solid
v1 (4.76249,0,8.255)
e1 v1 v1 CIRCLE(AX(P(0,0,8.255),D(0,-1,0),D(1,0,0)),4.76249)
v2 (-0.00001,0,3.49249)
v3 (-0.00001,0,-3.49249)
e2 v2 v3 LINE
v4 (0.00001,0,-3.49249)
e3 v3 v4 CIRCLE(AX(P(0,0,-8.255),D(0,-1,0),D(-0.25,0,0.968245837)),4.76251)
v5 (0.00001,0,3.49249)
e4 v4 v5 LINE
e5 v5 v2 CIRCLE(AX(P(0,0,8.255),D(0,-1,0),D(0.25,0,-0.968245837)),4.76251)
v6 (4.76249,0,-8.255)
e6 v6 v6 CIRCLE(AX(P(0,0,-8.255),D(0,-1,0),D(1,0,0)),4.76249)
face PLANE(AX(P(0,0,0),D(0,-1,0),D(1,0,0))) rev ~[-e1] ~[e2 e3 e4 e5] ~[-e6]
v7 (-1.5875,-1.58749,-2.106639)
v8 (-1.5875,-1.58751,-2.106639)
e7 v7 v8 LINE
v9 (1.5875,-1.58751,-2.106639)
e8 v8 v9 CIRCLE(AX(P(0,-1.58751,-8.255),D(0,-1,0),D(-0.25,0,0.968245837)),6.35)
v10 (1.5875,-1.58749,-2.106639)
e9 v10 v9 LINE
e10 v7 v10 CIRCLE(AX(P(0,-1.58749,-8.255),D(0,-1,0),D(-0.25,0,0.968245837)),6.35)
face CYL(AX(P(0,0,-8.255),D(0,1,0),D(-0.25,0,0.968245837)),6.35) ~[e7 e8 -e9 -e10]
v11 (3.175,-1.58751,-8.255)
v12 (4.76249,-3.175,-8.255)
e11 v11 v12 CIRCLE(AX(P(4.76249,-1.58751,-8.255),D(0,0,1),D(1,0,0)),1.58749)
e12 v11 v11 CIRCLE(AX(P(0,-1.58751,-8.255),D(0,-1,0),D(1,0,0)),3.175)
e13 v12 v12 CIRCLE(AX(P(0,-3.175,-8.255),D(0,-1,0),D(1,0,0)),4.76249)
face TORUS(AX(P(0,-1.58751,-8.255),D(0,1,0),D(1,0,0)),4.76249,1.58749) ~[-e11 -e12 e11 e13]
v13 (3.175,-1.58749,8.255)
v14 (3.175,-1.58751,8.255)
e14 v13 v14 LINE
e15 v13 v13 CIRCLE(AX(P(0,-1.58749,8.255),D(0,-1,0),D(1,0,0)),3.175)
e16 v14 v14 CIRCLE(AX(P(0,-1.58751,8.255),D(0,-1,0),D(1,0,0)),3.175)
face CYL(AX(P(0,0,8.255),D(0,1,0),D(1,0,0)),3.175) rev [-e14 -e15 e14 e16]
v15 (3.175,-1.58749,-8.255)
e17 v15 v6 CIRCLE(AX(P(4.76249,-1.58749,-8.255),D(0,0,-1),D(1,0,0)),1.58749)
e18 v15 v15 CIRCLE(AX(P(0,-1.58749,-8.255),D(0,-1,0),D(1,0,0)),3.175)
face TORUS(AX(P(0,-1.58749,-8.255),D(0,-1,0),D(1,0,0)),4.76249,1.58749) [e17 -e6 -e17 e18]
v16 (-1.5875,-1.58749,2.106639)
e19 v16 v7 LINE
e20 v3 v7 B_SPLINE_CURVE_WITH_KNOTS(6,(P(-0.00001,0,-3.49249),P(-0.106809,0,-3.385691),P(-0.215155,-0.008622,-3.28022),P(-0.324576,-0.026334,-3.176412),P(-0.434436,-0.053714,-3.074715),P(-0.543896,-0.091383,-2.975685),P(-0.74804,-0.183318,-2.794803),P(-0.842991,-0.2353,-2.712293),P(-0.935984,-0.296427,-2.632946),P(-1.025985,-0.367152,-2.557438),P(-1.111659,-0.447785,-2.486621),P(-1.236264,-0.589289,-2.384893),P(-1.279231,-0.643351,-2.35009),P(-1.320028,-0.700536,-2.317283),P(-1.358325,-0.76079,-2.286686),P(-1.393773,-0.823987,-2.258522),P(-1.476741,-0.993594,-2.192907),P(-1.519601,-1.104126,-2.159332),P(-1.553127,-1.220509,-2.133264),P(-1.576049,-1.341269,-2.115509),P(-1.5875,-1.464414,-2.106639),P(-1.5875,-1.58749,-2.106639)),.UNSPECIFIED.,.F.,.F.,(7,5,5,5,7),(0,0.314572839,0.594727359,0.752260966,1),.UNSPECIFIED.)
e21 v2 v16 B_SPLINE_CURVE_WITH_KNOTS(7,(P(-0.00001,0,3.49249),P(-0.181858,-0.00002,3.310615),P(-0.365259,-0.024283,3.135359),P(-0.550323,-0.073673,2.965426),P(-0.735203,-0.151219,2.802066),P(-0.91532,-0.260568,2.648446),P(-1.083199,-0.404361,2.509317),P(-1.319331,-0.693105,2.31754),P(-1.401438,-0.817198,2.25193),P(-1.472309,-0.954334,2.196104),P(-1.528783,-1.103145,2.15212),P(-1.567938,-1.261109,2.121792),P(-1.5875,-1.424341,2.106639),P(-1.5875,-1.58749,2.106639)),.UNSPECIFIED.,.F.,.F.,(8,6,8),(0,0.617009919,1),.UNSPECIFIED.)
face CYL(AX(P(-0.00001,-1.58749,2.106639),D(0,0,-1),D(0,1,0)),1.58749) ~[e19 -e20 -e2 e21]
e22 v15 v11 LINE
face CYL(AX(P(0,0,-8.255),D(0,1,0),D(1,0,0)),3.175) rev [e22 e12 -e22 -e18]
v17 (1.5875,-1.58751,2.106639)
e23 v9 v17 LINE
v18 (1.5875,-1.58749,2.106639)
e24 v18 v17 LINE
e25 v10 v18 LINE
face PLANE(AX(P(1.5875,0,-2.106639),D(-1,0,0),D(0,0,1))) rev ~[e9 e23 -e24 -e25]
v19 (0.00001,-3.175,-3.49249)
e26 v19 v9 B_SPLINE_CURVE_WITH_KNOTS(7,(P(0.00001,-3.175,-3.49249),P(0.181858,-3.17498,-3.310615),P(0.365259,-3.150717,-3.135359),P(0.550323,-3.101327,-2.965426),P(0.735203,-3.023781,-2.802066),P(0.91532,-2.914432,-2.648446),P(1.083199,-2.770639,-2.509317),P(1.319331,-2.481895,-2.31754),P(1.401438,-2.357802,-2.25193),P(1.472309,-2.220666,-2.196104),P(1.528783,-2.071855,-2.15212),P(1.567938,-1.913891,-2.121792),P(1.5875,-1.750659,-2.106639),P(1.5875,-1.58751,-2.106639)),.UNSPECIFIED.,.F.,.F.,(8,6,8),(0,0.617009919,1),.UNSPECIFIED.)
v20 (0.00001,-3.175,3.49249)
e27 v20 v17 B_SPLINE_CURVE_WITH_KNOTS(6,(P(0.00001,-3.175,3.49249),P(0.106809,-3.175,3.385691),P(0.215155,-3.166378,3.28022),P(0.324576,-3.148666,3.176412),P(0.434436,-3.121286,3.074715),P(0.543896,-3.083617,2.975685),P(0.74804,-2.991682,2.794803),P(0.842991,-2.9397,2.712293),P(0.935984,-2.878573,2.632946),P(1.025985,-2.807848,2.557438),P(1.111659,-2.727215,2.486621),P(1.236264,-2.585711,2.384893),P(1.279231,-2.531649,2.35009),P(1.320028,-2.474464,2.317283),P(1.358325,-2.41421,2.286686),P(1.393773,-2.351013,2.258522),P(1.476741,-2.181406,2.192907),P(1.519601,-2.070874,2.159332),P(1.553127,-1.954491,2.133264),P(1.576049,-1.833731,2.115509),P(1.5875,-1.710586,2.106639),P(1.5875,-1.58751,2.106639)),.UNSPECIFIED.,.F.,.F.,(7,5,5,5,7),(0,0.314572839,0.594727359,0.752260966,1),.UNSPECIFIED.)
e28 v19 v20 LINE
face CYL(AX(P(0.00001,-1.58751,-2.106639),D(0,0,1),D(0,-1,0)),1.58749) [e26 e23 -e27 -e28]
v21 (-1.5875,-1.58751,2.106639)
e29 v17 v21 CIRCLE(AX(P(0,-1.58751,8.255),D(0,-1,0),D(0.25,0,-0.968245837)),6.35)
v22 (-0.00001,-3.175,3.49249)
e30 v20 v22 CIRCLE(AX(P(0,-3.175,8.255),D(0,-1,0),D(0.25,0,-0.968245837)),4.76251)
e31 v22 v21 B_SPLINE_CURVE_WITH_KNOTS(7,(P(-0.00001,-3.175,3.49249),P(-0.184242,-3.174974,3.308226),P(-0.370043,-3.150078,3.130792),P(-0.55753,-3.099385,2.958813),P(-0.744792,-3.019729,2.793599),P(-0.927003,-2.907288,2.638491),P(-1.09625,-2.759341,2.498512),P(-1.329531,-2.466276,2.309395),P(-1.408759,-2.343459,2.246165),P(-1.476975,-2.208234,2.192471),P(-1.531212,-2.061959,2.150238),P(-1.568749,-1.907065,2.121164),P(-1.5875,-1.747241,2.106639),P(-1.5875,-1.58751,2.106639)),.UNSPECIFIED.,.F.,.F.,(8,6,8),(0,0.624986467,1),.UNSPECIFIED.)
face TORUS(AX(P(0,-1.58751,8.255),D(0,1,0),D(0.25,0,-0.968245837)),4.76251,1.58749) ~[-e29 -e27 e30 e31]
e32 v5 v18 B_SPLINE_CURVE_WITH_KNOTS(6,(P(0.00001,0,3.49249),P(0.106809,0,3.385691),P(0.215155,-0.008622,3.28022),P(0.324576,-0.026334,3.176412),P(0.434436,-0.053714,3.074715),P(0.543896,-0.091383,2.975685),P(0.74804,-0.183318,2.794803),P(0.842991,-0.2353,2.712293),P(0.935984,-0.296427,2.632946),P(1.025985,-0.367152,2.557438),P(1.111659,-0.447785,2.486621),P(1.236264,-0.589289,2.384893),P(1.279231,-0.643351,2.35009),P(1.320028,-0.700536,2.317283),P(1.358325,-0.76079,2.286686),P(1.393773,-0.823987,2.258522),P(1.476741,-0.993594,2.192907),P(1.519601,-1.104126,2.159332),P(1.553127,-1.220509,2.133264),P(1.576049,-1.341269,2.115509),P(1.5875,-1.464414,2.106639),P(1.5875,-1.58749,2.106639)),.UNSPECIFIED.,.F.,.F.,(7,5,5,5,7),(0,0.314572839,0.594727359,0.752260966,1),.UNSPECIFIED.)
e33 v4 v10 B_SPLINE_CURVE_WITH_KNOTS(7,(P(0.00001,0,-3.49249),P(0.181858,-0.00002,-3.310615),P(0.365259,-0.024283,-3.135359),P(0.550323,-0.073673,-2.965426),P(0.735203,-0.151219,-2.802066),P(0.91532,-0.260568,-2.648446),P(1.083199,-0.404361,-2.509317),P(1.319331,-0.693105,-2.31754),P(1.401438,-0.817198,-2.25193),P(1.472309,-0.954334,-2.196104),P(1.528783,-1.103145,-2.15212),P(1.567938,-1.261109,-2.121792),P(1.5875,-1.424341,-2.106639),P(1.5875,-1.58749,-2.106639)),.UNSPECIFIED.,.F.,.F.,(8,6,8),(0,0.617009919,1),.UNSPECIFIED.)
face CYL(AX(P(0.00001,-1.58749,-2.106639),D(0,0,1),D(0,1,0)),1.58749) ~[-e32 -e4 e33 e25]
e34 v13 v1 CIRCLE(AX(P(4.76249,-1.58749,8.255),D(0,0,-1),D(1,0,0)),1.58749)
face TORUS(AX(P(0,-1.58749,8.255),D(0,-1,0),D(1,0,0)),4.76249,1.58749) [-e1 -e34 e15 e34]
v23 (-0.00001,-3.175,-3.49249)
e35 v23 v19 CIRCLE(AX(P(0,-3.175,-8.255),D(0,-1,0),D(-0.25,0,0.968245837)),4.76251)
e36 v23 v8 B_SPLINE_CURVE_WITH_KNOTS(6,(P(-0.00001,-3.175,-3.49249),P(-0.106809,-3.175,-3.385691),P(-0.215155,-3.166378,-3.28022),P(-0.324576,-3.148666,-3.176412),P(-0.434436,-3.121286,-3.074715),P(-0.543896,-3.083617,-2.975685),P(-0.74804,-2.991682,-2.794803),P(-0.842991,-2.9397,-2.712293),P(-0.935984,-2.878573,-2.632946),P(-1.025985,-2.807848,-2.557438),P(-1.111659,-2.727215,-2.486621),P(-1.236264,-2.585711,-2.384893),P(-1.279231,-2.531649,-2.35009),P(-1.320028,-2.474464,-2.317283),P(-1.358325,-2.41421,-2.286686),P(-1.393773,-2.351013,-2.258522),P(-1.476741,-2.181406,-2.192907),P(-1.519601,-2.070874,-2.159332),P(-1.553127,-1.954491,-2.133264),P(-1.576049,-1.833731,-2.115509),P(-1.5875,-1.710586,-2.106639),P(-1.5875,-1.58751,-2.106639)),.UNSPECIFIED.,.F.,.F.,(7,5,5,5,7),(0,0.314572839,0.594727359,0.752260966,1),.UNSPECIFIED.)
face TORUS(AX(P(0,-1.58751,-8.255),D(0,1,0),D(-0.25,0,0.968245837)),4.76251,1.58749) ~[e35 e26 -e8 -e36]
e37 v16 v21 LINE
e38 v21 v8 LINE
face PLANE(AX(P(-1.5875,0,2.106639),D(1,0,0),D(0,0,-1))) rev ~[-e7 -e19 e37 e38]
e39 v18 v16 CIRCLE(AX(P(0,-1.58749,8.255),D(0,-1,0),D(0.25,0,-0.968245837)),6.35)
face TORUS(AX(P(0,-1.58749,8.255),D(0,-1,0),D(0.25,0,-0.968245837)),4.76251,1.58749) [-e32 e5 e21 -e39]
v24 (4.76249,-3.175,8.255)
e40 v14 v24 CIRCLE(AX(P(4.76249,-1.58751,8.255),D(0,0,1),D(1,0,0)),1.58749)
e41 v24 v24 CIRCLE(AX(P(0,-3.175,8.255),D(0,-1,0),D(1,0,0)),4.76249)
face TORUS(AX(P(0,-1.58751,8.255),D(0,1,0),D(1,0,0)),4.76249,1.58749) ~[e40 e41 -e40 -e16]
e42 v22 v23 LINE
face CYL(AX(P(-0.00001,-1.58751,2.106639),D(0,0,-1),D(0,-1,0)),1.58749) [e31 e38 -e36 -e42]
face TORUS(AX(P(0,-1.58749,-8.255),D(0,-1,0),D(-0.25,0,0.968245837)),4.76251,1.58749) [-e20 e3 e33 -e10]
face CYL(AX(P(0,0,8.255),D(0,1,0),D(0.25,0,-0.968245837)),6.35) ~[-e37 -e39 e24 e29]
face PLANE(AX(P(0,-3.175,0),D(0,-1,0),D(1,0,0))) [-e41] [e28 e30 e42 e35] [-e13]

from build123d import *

# Parameters (mm, degrees)
F0_R     = 3.175
F1_DEPTH = 3.175
F2_R     = 1.58749
F3_R     = 1.58749


# Not quite as in the source:
# - a fillet or chamfer is up to 0.001 mm smaller than in the source, because OpenCascade refuses the exact size


with BuildPart() as f1:
    # F0 (on Front) → F1 (new body)
    with BuildSketch(Plane.XZ):
        with BuildLine():
            Line((-1.5875, 2.1066389379), (-1.5875, -2.1066389379))
            ThreePointArc((-1.5875, -2.1066389379), (0, -14.605), (1.5875, -2.1066389379))
            Line((1.5875, -2.1066389379), (1.5875, 2.1066389379))
            ThreePointArc((1.5875, 2.1066389379), (0, 14.605), (-1.5875, 2.1066389379))
        make_face()
        with Locations((0, -8.255)):
            Circle(F0_R, mode=Mode.SUBTRACT)
        with Locations((0, 8.255)):
            Circle(F0_R, mode=Mode.SUBTRACT)
    extrude(amount=F1_DEPTH)

    # F2 (radius 1.5875 in the source; OpenCascade refuses exactly that, so slightly less here)
    f2_edges = [f1.edges().sort_by_distance(p)[0] for p in [
        (-3.175, 0, 8.255),
        (-3.175, 0, -8.255),
        (-3.175, -3.175, 8.255),
        (-3.175, -3.175, -8.255),
    ]]
    fillet(f2_edges, radius=F2_R)

    # F3 (radius 1.5875 in the source; OpenCascade refuses exactly that, so slightly less here)
    f3_edges = [f1.edges().sort_by_distance(p)[0] for p in [
        (0, -3.175, 14.605),
        (-1.5875, -3.175, 0),
        (1.5875, -3.175, 0),
        (0, -3.175, -14.605),
        (0, 0, 14.605),
        (0, 0, -14.605),
        (-1.5875, 0, 0),
        (1.5875, 0, 0),
    ]]
    fillet(f3_edges, radius=F3_R)


solid = f1.part
